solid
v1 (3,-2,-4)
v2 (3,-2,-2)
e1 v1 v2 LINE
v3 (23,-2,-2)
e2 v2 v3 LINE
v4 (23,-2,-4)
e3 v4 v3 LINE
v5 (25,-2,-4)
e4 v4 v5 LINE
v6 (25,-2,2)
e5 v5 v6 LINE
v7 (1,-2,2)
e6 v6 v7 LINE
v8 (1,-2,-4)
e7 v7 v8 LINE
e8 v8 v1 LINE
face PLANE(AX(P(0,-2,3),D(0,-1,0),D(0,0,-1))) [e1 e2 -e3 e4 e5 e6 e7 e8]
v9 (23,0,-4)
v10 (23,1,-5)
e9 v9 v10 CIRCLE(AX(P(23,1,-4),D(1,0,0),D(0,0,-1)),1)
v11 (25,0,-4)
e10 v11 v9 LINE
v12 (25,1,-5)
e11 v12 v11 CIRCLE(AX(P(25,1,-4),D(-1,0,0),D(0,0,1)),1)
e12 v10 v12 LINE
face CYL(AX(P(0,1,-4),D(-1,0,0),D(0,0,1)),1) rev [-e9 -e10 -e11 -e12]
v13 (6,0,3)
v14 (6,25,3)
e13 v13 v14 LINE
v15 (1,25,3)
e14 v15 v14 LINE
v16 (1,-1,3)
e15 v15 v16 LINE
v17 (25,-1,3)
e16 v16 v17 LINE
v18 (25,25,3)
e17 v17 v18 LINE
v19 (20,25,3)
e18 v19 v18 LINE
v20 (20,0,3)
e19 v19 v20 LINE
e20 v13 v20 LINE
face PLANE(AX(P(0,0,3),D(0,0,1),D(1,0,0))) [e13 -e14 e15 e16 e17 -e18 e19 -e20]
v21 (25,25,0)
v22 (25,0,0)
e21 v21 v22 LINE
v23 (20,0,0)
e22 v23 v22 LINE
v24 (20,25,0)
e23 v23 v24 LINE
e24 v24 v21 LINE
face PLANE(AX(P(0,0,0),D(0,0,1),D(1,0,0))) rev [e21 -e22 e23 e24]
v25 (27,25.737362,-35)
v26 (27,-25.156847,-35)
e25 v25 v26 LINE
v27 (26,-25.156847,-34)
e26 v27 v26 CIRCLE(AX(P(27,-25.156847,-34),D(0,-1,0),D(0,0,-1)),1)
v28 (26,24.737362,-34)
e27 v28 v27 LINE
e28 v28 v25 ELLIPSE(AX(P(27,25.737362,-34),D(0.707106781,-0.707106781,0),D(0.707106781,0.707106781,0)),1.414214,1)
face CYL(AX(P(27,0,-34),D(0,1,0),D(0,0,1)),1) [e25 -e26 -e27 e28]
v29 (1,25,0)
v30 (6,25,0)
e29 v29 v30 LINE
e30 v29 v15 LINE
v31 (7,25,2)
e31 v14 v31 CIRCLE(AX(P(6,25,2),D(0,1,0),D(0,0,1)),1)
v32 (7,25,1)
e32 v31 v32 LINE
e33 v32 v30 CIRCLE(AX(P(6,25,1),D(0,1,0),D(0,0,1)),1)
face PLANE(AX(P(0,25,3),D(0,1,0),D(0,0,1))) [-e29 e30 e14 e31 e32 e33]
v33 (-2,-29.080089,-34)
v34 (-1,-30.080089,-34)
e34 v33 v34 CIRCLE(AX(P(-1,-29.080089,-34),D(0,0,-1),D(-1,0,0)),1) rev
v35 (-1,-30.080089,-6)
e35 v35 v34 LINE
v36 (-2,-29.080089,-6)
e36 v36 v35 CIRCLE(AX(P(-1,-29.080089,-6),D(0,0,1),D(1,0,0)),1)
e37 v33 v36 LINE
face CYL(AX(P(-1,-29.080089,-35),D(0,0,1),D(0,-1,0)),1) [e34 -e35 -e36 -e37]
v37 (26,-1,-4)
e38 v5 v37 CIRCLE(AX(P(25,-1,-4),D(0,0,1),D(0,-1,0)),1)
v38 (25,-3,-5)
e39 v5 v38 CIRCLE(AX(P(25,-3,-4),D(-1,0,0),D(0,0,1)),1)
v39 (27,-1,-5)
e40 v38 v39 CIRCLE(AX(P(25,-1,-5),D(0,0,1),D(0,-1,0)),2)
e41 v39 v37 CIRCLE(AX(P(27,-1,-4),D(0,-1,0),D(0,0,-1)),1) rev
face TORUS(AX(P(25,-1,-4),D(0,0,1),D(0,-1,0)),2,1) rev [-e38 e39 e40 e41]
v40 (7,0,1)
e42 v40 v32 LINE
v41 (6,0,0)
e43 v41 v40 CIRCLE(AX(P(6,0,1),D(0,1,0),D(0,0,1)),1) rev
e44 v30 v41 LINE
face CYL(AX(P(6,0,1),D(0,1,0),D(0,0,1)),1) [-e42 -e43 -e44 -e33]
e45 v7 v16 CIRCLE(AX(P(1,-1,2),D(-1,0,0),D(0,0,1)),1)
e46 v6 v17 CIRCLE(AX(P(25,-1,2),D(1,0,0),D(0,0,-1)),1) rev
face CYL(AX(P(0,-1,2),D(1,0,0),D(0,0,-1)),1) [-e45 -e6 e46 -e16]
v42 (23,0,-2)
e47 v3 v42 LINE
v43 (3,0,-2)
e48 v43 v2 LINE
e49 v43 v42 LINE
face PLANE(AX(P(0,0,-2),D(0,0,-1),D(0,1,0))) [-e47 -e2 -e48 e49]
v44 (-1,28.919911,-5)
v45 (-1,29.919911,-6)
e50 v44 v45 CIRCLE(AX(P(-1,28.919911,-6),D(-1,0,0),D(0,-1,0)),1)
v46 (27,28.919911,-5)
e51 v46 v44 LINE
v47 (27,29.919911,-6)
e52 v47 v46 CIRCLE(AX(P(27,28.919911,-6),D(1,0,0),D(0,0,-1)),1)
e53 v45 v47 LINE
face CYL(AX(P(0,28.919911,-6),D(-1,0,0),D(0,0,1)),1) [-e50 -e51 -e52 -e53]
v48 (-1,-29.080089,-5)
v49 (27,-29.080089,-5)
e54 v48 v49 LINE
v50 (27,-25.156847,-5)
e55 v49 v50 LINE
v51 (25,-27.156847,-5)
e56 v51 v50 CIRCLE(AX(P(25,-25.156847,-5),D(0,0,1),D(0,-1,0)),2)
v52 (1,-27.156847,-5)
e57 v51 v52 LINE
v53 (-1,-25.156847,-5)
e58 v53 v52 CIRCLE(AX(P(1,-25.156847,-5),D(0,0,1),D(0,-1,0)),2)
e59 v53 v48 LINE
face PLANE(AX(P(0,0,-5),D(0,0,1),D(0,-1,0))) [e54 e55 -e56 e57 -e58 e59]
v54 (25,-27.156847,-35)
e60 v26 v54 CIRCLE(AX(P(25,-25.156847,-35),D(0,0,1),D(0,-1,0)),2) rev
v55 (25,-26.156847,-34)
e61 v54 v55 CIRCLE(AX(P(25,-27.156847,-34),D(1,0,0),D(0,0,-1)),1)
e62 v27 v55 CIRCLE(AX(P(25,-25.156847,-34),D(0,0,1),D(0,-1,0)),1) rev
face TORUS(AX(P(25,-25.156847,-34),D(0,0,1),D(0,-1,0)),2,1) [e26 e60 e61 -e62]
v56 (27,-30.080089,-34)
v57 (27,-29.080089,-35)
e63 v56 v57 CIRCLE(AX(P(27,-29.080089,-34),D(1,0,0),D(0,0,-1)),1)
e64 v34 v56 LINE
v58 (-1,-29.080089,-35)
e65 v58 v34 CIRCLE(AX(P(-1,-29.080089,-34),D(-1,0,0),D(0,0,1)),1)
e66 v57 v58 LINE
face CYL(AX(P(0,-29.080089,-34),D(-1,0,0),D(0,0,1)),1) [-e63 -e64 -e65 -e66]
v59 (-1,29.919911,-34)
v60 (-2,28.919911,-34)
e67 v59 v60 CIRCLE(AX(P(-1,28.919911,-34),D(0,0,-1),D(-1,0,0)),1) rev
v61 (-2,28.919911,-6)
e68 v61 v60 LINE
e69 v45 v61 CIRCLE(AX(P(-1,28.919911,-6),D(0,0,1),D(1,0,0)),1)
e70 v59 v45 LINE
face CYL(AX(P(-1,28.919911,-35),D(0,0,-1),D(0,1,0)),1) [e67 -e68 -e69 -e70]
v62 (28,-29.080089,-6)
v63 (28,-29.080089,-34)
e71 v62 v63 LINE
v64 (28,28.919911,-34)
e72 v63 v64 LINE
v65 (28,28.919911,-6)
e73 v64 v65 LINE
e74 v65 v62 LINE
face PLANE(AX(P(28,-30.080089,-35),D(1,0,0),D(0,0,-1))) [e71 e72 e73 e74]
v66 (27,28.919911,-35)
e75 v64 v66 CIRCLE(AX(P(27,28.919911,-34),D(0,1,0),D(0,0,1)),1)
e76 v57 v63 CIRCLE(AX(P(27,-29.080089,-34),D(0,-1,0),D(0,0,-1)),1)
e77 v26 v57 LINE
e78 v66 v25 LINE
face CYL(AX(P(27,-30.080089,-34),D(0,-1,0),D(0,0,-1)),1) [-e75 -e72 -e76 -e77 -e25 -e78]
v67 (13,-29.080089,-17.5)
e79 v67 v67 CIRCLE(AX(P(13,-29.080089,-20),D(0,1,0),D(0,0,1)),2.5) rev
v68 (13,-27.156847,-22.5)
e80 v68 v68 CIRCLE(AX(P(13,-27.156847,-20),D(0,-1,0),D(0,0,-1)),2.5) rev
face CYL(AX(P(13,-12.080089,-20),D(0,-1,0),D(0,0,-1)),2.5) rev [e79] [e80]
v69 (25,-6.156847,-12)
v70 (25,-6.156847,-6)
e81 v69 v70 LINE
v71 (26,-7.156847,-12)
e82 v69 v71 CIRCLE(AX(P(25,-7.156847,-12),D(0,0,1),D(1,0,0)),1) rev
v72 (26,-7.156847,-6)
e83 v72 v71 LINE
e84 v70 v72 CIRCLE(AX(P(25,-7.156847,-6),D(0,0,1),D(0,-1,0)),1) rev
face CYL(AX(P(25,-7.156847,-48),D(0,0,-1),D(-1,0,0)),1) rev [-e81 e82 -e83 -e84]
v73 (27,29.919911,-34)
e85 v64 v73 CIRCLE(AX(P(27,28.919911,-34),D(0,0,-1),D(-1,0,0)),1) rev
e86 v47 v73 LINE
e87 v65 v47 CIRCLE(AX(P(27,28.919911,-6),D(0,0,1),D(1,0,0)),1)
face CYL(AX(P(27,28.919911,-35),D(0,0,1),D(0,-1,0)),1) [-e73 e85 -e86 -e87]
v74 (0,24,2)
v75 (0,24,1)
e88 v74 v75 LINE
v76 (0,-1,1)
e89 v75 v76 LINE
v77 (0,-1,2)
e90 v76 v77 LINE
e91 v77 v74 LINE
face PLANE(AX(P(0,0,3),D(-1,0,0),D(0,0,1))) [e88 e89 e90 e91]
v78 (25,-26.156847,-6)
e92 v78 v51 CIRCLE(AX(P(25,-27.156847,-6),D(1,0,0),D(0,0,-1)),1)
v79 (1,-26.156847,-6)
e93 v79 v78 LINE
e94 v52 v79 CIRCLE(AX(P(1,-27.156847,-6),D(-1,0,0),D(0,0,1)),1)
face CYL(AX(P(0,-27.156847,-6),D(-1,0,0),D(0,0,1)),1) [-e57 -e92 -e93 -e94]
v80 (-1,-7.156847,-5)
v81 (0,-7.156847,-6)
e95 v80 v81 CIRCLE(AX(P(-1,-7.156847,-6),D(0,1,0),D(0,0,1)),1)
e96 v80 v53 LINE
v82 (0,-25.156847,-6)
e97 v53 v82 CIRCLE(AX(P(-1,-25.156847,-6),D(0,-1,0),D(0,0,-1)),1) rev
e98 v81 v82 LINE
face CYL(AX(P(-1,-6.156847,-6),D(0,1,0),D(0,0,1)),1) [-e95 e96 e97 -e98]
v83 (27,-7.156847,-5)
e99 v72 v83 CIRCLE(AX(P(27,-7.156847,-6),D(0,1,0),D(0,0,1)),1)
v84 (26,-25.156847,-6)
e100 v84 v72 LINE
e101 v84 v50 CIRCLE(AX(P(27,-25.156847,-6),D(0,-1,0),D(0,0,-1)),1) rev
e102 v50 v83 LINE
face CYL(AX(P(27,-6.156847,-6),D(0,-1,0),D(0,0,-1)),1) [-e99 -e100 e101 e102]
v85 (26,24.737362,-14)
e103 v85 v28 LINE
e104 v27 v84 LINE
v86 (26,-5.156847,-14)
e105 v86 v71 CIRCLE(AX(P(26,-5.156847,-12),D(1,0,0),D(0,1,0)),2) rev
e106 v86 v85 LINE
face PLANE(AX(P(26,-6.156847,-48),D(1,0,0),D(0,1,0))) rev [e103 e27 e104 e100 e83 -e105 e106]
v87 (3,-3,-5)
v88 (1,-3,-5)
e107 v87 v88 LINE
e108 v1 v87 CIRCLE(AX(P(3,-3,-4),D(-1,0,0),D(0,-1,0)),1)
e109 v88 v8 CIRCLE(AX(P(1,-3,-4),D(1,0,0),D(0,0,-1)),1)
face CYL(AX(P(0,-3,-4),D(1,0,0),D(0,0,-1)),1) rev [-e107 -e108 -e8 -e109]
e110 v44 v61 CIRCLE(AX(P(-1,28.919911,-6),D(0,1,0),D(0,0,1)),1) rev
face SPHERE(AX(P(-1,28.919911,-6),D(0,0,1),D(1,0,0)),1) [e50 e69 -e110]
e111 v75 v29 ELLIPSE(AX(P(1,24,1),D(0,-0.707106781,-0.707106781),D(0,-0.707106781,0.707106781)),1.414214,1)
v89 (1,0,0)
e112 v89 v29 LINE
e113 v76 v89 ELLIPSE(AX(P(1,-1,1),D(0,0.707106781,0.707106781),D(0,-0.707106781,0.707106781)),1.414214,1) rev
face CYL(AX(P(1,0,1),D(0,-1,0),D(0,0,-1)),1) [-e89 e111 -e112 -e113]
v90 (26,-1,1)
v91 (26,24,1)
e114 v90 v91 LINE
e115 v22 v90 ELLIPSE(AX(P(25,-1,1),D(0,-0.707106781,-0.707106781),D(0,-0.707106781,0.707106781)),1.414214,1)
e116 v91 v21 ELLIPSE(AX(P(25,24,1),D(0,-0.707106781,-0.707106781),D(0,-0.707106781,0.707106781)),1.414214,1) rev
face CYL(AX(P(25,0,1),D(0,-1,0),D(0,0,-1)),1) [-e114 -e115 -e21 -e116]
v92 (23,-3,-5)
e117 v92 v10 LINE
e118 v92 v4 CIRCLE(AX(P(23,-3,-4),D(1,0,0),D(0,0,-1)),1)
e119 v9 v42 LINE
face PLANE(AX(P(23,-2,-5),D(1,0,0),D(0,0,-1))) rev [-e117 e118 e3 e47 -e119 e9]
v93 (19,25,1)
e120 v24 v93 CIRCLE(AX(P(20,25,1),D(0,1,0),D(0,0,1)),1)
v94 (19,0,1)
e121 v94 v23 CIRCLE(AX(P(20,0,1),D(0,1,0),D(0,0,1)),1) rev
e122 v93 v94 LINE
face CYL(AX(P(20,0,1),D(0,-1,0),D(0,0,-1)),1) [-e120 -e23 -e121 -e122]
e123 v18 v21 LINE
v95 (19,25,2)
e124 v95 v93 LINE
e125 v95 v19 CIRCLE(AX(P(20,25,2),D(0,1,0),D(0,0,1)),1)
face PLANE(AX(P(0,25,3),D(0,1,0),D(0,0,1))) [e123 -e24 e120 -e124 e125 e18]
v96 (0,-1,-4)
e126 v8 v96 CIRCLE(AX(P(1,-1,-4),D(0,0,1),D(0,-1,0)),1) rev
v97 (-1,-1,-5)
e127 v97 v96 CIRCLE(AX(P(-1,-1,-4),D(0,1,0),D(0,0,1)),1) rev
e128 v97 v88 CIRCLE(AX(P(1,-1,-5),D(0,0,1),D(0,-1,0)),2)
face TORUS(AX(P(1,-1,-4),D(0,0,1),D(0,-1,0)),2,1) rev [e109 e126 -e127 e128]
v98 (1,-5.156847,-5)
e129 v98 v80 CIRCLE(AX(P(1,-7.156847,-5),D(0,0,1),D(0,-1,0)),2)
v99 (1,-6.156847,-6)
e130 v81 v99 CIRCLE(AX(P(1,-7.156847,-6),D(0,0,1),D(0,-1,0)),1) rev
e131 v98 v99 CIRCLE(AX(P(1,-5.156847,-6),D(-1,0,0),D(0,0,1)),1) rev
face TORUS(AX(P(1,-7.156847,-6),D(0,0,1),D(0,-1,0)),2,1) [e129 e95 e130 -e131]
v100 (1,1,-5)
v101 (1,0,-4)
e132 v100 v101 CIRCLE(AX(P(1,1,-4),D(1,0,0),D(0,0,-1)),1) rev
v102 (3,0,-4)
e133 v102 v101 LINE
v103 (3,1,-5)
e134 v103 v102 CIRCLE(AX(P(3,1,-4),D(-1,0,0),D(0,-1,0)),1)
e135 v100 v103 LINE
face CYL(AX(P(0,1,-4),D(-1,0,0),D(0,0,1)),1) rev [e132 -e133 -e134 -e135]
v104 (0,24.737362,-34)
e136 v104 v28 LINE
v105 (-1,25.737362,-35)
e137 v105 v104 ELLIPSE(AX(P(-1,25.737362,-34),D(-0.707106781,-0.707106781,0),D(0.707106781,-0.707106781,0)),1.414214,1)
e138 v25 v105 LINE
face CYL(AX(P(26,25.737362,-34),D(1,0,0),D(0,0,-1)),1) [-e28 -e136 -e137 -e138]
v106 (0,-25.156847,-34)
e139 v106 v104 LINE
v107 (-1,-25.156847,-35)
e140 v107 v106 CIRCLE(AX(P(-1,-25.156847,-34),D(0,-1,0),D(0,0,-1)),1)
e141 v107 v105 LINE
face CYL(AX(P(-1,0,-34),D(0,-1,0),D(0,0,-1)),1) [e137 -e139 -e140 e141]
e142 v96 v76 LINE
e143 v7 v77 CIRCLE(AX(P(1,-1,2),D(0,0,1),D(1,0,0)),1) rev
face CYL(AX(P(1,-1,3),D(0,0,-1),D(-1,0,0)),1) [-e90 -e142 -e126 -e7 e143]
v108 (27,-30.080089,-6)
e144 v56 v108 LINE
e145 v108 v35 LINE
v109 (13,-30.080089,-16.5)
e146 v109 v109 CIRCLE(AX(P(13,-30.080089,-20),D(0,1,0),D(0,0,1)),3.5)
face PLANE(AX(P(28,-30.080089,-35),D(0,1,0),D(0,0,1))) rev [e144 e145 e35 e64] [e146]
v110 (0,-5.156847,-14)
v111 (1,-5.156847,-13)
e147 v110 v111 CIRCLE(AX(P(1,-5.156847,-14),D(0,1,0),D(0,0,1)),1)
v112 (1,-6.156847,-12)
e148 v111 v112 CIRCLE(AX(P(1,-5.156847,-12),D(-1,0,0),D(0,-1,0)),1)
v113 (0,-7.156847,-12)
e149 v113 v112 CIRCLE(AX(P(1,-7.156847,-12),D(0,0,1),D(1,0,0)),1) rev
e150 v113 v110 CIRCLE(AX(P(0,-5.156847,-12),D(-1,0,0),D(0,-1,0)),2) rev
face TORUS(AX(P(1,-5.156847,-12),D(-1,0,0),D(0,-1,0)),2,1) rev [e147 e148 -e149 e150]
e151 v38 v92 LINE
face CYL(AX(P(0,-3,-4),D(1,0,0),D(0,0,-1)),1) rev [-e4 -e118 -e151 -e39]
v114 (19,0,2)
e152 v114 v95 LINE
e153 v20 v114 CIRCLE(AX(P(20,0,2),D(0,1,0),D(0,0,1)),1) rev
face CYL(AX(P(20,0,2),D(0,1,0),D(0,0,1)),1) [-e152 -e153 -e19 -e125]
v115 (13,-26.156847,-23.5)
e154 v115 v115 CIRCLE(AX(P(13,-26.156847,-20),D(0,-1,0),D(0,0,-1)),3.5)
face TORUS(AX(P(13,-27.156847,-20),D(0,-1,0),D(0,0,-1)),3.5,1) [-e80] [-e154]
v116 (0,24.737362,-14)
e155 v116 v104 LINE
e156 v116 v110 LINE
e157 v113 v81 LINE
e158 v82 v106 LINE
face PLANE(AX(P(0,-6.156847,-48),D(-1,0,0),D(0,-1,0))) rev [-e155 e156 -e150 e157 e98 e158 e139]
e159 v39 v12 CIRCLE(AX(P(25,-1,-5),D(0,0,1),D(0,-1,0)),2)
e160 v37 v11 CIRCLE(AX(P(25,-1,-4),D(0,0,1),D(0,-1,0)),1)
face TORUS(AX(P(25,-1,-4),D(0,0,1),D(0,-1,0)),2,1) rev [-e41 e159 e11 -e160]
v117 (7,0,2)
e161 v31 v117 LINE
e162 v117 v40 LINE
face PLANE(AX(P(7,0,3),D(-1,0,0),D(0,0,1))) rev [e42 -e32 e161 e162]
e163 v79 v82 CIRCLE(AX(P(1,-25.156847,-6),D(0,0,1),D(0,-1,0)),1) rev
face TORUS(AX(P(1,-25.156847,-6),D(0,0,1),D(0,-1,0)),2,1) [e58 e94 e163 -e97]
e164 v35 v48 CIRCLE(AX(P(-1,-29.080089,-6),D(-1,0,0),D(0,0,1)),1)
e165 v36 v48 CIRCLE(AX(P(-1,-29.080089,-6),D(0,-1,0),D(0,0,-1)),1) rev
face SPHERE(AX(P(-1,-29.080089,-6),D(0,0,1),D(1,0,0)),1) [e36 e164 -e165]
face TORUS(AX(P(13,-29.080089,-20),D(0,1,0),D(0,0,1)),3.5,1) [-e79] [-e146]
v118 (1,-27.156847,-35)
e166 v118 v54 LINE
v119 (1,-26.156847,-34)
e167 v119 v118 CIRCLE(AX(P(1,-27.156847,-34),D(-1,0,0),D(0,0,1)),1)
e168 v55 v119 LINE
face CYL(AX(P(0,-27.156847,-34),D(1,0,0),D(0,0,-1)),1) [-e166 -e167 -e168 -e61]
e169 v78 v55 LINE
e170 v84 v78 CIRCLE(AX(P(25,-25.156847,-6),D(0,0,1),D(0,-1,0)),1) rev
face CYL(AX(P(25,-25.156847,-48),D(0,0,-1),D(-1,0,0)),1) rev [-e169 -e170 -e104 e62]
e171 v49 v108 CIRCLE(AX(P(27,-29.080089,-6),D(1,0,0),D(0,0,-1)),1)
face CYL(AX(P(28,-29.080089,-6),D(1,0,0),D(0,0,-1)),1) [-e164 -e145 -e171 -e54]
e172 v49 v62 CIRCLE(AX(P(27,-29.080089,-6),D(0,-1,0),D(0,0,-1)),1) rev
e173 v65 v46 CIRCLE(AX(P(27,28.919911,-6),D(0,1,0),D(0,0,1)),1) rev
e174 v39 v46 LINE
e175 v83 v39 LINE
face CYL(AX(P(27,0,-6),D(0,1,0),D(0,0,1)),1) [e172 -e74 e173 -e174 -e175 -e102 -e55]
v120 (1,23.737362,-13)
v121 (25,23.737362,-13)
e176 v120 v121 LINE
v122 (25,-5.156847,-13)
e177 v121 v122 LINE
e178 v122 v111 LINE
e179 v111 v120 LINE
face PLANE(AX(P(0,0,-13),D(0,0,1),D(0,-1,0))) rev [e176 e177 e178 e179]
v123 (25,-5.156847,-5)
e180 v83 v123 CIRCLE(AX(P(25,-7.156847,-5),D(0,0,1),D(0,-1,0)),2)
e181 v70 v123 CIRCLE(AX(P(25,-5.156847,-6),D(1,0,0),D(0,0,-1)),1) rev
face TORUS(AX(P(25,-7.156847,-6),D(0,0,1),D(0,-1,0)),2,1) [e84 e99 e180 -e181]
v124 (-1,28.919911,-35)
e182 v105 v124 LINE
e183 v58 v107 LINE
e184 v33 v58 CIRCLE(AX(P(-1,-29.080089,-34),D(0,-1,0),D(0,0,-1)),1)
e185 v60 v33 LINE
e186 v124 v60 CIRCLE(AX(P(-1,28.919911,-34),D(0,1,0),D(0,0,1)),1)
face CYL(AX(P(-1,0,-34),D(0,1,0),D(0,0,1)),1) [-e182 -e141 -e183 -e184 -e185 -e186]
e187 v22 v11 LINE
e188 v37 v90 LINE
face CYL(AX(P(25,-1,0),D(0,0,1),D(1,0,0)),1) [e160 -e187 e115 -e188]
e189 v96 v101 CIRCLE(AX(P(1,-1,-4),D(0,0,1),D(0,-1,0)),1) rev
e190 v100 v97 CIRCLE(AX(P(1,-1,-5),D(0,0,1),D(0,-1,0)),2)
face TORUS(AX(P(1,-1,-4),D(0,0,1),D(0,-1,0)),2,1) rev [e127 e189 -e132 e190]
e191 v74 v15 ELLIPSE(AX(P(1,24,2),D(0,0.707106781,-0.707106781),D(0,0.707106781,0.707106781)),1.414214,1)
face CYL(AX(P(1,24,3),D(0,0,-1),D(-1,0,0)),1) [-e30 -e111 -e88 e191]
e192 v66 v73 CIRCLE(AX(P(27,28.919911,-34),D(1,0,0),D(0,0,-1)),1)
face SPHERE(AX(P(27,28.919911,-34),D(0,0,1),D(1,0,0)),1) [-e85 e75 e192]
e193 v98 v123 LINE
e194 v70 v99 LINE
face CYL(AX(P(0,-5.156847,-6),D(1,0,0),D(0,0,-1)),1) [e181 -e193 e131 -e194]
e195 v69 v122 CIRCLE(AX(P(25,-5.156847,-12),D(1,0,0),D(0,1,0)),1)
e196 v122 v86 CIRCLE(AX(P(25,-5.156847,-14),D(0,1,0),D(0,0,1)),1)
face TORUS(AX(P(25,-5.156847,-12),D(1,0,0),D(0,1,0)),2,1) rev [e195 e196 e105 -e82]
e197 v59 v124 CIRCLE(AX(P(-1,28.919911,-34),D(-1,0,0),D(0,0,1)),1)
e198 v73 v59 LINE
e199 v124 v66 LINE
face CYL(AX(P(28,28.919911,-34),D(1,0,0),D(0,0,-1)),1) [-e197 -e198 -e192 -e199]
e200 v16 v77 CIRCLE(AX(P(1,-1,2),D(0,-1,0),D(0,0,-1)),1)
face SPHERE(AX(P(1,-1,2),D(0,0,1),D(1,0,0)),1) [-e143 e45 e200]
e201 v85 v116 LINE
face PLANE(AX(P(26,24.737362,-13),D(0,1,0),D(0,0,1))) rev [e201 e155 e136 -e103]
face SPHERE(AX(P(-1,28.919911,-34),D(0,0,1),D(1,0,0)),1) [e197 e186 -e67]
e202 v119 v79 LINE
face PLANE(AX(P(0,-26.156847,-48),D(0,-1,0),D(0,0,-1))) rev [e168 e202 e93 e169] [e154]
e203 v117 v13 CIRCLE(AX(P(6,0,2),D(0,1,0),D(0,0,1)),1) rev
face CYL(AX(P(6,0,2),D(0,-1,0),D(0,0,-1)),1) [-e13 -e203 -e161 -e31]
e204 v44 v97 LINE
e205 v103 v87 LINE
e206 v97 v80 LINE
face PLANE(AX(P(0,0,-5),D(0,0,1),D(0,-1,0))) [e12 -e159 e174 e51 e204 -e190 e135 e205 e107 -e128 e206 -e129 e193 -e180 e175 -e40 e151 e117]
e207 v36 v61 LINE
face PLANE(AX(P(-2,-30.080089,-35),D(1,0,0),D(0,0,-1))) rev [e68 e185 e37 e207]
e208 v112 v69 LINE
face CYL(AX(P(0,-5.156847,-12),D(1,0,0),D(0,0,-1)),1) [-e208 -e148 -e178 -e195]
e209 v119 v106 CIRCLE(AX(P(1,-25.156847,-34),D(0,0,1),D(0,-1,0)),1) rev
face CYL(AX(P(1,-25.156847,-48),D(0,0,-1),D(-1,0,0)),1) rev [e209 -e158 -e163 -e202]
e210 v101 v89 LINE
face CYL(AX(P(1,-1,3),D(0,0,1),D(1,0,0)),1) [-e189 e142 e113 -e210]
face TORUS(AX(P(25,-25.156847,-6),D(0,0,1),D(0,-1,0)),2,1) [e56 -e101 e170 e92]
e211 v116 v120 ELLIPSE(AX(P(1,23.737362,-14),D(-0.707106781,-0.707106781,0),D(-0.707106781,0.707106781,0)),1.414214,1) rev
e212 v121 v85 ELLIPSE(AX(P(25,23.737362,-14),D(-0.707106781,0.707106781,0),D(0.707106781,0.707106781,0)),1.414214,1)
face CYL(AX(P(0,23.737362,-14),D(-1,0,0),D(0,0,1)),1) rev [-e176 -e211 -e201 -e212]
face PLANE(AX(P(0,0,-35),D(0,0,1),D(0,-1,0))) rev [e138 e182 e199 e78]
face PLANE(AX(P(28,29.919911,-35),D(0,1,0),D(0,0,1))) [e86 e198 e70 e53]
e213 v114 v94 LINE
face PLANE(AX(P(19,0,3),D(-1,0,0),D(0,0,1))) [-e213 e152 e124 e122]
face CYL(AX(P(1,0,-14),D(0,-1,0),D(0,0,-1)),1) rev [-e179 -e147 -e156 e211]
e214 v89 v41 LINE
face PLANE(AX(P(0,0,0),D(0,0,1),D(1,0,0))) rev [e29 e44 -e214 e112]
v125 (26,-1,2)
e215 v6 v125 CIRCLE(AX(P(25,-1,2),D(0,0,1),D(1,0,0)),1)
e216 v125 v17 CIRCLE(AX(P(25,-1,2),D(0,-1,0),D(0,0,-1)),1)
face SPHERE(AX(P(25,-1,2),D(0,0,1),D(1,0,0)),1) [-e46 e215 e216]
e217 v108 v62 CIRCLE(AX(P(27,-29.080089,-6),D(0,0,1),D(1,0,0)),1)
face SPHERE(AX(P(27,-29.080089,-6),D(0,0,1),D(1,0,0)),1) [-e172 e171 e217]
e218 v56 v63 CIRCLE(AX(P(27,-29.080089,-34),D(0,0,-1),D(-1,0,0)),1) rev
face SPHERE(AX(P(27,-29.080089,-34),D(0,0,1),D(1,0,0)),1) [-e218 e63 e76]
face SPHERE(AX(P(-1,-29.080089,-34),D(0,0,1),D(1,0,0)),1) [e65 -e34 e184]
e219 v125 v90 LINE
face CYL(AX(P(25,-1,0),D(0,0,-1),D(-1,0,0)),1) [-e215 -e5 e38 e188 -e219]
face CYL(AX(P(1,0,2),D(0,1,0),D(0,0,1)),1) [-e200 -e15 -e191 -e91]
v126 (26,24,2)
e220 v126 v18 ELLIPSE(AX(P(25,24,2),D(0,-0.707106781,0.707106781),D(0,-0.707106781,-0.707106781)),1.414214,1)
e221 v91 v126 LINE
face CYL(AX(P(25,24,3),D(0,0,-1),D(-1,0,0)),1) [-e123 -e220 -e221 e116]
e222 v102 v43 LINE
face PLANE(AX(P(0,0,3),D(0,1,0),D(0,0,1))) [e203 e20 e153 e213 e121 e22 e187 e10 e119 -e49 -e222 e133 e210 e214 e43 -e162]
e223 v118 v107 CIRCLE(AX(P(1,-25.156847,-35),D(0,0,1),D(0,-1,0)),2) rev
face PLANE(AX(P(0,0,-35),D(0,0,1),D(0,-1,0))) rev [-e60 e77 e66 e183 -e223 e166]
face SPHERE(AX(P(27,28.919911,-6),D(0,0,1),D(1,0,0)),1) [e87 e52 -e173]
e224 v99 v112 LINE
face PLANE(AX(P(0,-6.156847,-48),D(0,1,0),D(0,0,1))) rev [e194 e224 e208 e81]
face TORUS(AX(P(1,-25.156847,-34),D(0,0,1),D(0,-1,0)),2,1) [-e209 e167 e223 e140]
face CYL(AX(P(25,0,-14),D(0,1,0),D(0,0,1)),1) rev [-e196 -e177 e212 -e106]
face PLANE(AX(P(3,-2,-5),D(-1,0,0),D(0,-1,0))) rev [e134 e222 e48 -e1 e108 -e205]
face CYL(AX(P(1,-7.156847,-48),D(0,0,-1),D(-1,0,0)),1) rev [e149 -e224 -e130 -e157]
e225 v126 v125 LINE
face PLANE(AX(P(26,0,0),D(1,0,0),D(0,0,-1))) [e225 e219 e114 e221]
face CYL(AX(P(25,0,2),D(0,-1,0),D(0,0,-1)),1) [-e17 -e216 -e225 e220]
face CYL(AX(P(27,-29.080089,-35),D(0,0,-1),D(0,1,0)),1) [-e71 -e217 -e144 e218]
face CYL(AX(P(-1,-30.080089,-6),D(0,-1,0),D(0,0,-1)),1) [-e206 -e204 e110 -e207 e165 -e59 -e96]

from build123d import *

# Parameters (mm, degrees)
SKETCH3_W             = 7
SKETCH3_H             = 25
BOSS_EXTRUDE2_DEPTH   = 3
BOSS_EXTRUDE2_2_DEPTH = 3
SKETCH4_W             = 5
SKETCH4_H             = 2
BOSS_EXTRUDE3_DEPTH   = 26
SKETCH5_W             = 3
SKETCH5_H             = 2
BOSS_EXTRUDE4_DEPTH   = 3
SKETCH6_W             = 30
SKETCH6_H             = 60
BOSS_EXTRUDE5_DEPTH   = 30
SKETCH7_W             = 26
SKETCH7_H             = 20
CUT_EXTRUDE2_DEPTH    = 43
SKETCH8_R             = 2.5
CUT_EXTRUDE3_DEPTH    = 18
FILLET2_R             = 1
SKETCH9_W             = 26
SKETCH9_H             = 32.627592747
CUT_EXTRUDE4_DEPTH    = 22
FILLET3_R             = 1


with BuildPart() as part:
    # Sketch3 → Boss-Extrude2 (new body)
    with BuildSketch(Plane.XY):
        with Locations((3.5, 12.5)):
            Rectangle(SKETCH3_W, SKETCH3_H)
    extrude(amount=BOSS_EXTRUDE2_DEPTH)



with BuildPart() as body_2:
    # Sketch3 → Boss-Extrude2 2 (new body)
    with BuildSketch(Plane.XY):
        with Locations((22.5, 12.5)):
            Rectangle(SKETCH3_W, SKETCH3_H)
    extrude(amount=BOSS_EXTRUDE2_2_DEPTH)


with BuildPart() as part_1:
    add(part.part)

    add(body_2.part)  # Boss-Extrude3 merges body 2
    # Sketch4 → Boss-Extrude3 (add)
    with BuildSketch(Plane(origin=(26, 0, 0), x_dir=(0, 0, -1), z_dir=(1, 0, 0))):
        with Locations((-0.5, -1)):
            Rectangle(SKETCH4_W, SKETCH4_H)
    extrude(amount=-BOSS_EXTRUDE3_DEPTH)

    # Sketch5 → Boss-Extrude4 (add)
    with BuildSketch(Plane(origin=(0, 0, -2), x_dir=(-1, 0, 0), z_dir=(0, 0, -1))):
        with Locations((-24.5, -1)):
            Rectangle(SKETCH5_W, SKETCH5_H)
        with Locations((-1.5, -1)):
            Rectangle(SKETCH5_W, SKETCH5_H)
    extrude(amount=BOSS_EXTRUDE4_DEPTH)

    # Sketch6 → Boss-Extrude5 (add)
    with BuildSketch(Plane(origin=(0, 0, -5), x_dir=(-1, 0, 0), z_dir=(0, 0, -1))):
        with Locations((-13, -0.080088983)):
            Rectangle(SKETCH6_W, SKETCH6_H)
    extrude(amount=BOSS_EXTRUDE5_DEPTH)

    # Sketch7 → Cut-Extrude2 (cut)
    with BuildSketch(Plane.XY.offset(-5)):
        with Locations((13, -16.156846809)):
            Rectangle(SKETCH7_W, SKETCH7_H)
    extrude(amount=-CUT_EXTRUDE2_DEPTH, mode=Mode.SUBTRACT)

    # Sketch8 → Cut-Extrude3 (cut)
    with BuildSketch(Plane.XZ.offset(30.080088983)):
        with Locations(Location((13, -20, 0), (0, 0, 270))):
            Circle(SKETCH8_R)
    extrude(amount=-CUT_EXTRUDE3_DEPTH, mode=Mode.SUBTRACT)

    # Fillet2
    fillet2_edges = [part_1.edges().sort_by_distance(p)[0] for p in [
        (7, 12.5, 3),
        (13, -2, 3),
        (0, 0, -2.5),
        (0, -2, -1),
        (26, 11.5, 3),
        (26, -2, -1),
        (26, 0, -2.5),
        (0, 11.5, 3),
        (19, 12.5, 3),
        (26, 12.5, 0),
        (26, 25, 1.5),
        (19, 12.5, 0),
        (26, -1, -5),
        (24.5, -2, -5),
        (24.5, 0, -5),
        (0, -1, -5),
        (1.5, 0, -5),
        (1.5, -2, -5),
        (0, 12.5, 0),
        (7, 12.5, 0),
        (0, 25, 1.5),
    ]]
    fillet(fillet2_edges, radius=FILLET2_R - 0.0001)  # a hair under: the kernel refuses the full size

    # Sketch9 → Cut-Extrude4 (cut)
    with BuildSketch(Plane(origin=(0, 0, -35), x_dir=(-1, 0, 0), z_dir=(0, 0, -1))):
        with Locations((-13, 8.423565831)):
            Rectangle(SKETCH9_W, SKETCH9_H)
    extrude(amount=-CUT_EXTRUDE4_DEPTH, mode=Mode.SUBTRACT)

    # Fillet3
    fillet3_edges = [part_1.edges().sort_by_distance(p)[0] for p in [
        (13, -26.156846809, -17.5),
        (13, -30.080088983, -17.5),
        (26, -6.156846809, -9),
        (0, -6.156846809, -9),
        (26, 9.290257698, -13),
        (0, 9.290257698, -13),
        (13, -6.156846809, -13),
        (13, 24.737362205, -35),
        (13, 24.737362205, -13),
        (28, -0.080088983, -35),
        (28, 29.919911017, -20),
        (13, -30.080088983, -5),
        (28, -30.080088983, -20),
        (-2, -0.080088983, -5),
        (-2, -30.080088983, -20),
        (13, 29.919911017, -35),
        (-2, 29.919911017, -20),
        (13, -30.080088983, -35),
        (-2, -0.080088983, -35),
        (28, -0.080088983, -5),
        (13, 29.919911017, -5),
        (0, -0.709742302, -35),
        (0, -26.156846809, -20),
        (26, -0.709742302, -35),
        (13, -26.156846809, -35),
        (26, -26.156846809, -20),
        (0, -16.156846809, -5),
        (13, -26.156846809, -5),
        (26, -16.156846809, -5),
        (13, -6.156846809, -5),
    ]]
    fillet(fillet3_edges, radius=FILLET3_R - 0.0001)  # a hair under: the kernel refuses the full size


solid = part_1.part
